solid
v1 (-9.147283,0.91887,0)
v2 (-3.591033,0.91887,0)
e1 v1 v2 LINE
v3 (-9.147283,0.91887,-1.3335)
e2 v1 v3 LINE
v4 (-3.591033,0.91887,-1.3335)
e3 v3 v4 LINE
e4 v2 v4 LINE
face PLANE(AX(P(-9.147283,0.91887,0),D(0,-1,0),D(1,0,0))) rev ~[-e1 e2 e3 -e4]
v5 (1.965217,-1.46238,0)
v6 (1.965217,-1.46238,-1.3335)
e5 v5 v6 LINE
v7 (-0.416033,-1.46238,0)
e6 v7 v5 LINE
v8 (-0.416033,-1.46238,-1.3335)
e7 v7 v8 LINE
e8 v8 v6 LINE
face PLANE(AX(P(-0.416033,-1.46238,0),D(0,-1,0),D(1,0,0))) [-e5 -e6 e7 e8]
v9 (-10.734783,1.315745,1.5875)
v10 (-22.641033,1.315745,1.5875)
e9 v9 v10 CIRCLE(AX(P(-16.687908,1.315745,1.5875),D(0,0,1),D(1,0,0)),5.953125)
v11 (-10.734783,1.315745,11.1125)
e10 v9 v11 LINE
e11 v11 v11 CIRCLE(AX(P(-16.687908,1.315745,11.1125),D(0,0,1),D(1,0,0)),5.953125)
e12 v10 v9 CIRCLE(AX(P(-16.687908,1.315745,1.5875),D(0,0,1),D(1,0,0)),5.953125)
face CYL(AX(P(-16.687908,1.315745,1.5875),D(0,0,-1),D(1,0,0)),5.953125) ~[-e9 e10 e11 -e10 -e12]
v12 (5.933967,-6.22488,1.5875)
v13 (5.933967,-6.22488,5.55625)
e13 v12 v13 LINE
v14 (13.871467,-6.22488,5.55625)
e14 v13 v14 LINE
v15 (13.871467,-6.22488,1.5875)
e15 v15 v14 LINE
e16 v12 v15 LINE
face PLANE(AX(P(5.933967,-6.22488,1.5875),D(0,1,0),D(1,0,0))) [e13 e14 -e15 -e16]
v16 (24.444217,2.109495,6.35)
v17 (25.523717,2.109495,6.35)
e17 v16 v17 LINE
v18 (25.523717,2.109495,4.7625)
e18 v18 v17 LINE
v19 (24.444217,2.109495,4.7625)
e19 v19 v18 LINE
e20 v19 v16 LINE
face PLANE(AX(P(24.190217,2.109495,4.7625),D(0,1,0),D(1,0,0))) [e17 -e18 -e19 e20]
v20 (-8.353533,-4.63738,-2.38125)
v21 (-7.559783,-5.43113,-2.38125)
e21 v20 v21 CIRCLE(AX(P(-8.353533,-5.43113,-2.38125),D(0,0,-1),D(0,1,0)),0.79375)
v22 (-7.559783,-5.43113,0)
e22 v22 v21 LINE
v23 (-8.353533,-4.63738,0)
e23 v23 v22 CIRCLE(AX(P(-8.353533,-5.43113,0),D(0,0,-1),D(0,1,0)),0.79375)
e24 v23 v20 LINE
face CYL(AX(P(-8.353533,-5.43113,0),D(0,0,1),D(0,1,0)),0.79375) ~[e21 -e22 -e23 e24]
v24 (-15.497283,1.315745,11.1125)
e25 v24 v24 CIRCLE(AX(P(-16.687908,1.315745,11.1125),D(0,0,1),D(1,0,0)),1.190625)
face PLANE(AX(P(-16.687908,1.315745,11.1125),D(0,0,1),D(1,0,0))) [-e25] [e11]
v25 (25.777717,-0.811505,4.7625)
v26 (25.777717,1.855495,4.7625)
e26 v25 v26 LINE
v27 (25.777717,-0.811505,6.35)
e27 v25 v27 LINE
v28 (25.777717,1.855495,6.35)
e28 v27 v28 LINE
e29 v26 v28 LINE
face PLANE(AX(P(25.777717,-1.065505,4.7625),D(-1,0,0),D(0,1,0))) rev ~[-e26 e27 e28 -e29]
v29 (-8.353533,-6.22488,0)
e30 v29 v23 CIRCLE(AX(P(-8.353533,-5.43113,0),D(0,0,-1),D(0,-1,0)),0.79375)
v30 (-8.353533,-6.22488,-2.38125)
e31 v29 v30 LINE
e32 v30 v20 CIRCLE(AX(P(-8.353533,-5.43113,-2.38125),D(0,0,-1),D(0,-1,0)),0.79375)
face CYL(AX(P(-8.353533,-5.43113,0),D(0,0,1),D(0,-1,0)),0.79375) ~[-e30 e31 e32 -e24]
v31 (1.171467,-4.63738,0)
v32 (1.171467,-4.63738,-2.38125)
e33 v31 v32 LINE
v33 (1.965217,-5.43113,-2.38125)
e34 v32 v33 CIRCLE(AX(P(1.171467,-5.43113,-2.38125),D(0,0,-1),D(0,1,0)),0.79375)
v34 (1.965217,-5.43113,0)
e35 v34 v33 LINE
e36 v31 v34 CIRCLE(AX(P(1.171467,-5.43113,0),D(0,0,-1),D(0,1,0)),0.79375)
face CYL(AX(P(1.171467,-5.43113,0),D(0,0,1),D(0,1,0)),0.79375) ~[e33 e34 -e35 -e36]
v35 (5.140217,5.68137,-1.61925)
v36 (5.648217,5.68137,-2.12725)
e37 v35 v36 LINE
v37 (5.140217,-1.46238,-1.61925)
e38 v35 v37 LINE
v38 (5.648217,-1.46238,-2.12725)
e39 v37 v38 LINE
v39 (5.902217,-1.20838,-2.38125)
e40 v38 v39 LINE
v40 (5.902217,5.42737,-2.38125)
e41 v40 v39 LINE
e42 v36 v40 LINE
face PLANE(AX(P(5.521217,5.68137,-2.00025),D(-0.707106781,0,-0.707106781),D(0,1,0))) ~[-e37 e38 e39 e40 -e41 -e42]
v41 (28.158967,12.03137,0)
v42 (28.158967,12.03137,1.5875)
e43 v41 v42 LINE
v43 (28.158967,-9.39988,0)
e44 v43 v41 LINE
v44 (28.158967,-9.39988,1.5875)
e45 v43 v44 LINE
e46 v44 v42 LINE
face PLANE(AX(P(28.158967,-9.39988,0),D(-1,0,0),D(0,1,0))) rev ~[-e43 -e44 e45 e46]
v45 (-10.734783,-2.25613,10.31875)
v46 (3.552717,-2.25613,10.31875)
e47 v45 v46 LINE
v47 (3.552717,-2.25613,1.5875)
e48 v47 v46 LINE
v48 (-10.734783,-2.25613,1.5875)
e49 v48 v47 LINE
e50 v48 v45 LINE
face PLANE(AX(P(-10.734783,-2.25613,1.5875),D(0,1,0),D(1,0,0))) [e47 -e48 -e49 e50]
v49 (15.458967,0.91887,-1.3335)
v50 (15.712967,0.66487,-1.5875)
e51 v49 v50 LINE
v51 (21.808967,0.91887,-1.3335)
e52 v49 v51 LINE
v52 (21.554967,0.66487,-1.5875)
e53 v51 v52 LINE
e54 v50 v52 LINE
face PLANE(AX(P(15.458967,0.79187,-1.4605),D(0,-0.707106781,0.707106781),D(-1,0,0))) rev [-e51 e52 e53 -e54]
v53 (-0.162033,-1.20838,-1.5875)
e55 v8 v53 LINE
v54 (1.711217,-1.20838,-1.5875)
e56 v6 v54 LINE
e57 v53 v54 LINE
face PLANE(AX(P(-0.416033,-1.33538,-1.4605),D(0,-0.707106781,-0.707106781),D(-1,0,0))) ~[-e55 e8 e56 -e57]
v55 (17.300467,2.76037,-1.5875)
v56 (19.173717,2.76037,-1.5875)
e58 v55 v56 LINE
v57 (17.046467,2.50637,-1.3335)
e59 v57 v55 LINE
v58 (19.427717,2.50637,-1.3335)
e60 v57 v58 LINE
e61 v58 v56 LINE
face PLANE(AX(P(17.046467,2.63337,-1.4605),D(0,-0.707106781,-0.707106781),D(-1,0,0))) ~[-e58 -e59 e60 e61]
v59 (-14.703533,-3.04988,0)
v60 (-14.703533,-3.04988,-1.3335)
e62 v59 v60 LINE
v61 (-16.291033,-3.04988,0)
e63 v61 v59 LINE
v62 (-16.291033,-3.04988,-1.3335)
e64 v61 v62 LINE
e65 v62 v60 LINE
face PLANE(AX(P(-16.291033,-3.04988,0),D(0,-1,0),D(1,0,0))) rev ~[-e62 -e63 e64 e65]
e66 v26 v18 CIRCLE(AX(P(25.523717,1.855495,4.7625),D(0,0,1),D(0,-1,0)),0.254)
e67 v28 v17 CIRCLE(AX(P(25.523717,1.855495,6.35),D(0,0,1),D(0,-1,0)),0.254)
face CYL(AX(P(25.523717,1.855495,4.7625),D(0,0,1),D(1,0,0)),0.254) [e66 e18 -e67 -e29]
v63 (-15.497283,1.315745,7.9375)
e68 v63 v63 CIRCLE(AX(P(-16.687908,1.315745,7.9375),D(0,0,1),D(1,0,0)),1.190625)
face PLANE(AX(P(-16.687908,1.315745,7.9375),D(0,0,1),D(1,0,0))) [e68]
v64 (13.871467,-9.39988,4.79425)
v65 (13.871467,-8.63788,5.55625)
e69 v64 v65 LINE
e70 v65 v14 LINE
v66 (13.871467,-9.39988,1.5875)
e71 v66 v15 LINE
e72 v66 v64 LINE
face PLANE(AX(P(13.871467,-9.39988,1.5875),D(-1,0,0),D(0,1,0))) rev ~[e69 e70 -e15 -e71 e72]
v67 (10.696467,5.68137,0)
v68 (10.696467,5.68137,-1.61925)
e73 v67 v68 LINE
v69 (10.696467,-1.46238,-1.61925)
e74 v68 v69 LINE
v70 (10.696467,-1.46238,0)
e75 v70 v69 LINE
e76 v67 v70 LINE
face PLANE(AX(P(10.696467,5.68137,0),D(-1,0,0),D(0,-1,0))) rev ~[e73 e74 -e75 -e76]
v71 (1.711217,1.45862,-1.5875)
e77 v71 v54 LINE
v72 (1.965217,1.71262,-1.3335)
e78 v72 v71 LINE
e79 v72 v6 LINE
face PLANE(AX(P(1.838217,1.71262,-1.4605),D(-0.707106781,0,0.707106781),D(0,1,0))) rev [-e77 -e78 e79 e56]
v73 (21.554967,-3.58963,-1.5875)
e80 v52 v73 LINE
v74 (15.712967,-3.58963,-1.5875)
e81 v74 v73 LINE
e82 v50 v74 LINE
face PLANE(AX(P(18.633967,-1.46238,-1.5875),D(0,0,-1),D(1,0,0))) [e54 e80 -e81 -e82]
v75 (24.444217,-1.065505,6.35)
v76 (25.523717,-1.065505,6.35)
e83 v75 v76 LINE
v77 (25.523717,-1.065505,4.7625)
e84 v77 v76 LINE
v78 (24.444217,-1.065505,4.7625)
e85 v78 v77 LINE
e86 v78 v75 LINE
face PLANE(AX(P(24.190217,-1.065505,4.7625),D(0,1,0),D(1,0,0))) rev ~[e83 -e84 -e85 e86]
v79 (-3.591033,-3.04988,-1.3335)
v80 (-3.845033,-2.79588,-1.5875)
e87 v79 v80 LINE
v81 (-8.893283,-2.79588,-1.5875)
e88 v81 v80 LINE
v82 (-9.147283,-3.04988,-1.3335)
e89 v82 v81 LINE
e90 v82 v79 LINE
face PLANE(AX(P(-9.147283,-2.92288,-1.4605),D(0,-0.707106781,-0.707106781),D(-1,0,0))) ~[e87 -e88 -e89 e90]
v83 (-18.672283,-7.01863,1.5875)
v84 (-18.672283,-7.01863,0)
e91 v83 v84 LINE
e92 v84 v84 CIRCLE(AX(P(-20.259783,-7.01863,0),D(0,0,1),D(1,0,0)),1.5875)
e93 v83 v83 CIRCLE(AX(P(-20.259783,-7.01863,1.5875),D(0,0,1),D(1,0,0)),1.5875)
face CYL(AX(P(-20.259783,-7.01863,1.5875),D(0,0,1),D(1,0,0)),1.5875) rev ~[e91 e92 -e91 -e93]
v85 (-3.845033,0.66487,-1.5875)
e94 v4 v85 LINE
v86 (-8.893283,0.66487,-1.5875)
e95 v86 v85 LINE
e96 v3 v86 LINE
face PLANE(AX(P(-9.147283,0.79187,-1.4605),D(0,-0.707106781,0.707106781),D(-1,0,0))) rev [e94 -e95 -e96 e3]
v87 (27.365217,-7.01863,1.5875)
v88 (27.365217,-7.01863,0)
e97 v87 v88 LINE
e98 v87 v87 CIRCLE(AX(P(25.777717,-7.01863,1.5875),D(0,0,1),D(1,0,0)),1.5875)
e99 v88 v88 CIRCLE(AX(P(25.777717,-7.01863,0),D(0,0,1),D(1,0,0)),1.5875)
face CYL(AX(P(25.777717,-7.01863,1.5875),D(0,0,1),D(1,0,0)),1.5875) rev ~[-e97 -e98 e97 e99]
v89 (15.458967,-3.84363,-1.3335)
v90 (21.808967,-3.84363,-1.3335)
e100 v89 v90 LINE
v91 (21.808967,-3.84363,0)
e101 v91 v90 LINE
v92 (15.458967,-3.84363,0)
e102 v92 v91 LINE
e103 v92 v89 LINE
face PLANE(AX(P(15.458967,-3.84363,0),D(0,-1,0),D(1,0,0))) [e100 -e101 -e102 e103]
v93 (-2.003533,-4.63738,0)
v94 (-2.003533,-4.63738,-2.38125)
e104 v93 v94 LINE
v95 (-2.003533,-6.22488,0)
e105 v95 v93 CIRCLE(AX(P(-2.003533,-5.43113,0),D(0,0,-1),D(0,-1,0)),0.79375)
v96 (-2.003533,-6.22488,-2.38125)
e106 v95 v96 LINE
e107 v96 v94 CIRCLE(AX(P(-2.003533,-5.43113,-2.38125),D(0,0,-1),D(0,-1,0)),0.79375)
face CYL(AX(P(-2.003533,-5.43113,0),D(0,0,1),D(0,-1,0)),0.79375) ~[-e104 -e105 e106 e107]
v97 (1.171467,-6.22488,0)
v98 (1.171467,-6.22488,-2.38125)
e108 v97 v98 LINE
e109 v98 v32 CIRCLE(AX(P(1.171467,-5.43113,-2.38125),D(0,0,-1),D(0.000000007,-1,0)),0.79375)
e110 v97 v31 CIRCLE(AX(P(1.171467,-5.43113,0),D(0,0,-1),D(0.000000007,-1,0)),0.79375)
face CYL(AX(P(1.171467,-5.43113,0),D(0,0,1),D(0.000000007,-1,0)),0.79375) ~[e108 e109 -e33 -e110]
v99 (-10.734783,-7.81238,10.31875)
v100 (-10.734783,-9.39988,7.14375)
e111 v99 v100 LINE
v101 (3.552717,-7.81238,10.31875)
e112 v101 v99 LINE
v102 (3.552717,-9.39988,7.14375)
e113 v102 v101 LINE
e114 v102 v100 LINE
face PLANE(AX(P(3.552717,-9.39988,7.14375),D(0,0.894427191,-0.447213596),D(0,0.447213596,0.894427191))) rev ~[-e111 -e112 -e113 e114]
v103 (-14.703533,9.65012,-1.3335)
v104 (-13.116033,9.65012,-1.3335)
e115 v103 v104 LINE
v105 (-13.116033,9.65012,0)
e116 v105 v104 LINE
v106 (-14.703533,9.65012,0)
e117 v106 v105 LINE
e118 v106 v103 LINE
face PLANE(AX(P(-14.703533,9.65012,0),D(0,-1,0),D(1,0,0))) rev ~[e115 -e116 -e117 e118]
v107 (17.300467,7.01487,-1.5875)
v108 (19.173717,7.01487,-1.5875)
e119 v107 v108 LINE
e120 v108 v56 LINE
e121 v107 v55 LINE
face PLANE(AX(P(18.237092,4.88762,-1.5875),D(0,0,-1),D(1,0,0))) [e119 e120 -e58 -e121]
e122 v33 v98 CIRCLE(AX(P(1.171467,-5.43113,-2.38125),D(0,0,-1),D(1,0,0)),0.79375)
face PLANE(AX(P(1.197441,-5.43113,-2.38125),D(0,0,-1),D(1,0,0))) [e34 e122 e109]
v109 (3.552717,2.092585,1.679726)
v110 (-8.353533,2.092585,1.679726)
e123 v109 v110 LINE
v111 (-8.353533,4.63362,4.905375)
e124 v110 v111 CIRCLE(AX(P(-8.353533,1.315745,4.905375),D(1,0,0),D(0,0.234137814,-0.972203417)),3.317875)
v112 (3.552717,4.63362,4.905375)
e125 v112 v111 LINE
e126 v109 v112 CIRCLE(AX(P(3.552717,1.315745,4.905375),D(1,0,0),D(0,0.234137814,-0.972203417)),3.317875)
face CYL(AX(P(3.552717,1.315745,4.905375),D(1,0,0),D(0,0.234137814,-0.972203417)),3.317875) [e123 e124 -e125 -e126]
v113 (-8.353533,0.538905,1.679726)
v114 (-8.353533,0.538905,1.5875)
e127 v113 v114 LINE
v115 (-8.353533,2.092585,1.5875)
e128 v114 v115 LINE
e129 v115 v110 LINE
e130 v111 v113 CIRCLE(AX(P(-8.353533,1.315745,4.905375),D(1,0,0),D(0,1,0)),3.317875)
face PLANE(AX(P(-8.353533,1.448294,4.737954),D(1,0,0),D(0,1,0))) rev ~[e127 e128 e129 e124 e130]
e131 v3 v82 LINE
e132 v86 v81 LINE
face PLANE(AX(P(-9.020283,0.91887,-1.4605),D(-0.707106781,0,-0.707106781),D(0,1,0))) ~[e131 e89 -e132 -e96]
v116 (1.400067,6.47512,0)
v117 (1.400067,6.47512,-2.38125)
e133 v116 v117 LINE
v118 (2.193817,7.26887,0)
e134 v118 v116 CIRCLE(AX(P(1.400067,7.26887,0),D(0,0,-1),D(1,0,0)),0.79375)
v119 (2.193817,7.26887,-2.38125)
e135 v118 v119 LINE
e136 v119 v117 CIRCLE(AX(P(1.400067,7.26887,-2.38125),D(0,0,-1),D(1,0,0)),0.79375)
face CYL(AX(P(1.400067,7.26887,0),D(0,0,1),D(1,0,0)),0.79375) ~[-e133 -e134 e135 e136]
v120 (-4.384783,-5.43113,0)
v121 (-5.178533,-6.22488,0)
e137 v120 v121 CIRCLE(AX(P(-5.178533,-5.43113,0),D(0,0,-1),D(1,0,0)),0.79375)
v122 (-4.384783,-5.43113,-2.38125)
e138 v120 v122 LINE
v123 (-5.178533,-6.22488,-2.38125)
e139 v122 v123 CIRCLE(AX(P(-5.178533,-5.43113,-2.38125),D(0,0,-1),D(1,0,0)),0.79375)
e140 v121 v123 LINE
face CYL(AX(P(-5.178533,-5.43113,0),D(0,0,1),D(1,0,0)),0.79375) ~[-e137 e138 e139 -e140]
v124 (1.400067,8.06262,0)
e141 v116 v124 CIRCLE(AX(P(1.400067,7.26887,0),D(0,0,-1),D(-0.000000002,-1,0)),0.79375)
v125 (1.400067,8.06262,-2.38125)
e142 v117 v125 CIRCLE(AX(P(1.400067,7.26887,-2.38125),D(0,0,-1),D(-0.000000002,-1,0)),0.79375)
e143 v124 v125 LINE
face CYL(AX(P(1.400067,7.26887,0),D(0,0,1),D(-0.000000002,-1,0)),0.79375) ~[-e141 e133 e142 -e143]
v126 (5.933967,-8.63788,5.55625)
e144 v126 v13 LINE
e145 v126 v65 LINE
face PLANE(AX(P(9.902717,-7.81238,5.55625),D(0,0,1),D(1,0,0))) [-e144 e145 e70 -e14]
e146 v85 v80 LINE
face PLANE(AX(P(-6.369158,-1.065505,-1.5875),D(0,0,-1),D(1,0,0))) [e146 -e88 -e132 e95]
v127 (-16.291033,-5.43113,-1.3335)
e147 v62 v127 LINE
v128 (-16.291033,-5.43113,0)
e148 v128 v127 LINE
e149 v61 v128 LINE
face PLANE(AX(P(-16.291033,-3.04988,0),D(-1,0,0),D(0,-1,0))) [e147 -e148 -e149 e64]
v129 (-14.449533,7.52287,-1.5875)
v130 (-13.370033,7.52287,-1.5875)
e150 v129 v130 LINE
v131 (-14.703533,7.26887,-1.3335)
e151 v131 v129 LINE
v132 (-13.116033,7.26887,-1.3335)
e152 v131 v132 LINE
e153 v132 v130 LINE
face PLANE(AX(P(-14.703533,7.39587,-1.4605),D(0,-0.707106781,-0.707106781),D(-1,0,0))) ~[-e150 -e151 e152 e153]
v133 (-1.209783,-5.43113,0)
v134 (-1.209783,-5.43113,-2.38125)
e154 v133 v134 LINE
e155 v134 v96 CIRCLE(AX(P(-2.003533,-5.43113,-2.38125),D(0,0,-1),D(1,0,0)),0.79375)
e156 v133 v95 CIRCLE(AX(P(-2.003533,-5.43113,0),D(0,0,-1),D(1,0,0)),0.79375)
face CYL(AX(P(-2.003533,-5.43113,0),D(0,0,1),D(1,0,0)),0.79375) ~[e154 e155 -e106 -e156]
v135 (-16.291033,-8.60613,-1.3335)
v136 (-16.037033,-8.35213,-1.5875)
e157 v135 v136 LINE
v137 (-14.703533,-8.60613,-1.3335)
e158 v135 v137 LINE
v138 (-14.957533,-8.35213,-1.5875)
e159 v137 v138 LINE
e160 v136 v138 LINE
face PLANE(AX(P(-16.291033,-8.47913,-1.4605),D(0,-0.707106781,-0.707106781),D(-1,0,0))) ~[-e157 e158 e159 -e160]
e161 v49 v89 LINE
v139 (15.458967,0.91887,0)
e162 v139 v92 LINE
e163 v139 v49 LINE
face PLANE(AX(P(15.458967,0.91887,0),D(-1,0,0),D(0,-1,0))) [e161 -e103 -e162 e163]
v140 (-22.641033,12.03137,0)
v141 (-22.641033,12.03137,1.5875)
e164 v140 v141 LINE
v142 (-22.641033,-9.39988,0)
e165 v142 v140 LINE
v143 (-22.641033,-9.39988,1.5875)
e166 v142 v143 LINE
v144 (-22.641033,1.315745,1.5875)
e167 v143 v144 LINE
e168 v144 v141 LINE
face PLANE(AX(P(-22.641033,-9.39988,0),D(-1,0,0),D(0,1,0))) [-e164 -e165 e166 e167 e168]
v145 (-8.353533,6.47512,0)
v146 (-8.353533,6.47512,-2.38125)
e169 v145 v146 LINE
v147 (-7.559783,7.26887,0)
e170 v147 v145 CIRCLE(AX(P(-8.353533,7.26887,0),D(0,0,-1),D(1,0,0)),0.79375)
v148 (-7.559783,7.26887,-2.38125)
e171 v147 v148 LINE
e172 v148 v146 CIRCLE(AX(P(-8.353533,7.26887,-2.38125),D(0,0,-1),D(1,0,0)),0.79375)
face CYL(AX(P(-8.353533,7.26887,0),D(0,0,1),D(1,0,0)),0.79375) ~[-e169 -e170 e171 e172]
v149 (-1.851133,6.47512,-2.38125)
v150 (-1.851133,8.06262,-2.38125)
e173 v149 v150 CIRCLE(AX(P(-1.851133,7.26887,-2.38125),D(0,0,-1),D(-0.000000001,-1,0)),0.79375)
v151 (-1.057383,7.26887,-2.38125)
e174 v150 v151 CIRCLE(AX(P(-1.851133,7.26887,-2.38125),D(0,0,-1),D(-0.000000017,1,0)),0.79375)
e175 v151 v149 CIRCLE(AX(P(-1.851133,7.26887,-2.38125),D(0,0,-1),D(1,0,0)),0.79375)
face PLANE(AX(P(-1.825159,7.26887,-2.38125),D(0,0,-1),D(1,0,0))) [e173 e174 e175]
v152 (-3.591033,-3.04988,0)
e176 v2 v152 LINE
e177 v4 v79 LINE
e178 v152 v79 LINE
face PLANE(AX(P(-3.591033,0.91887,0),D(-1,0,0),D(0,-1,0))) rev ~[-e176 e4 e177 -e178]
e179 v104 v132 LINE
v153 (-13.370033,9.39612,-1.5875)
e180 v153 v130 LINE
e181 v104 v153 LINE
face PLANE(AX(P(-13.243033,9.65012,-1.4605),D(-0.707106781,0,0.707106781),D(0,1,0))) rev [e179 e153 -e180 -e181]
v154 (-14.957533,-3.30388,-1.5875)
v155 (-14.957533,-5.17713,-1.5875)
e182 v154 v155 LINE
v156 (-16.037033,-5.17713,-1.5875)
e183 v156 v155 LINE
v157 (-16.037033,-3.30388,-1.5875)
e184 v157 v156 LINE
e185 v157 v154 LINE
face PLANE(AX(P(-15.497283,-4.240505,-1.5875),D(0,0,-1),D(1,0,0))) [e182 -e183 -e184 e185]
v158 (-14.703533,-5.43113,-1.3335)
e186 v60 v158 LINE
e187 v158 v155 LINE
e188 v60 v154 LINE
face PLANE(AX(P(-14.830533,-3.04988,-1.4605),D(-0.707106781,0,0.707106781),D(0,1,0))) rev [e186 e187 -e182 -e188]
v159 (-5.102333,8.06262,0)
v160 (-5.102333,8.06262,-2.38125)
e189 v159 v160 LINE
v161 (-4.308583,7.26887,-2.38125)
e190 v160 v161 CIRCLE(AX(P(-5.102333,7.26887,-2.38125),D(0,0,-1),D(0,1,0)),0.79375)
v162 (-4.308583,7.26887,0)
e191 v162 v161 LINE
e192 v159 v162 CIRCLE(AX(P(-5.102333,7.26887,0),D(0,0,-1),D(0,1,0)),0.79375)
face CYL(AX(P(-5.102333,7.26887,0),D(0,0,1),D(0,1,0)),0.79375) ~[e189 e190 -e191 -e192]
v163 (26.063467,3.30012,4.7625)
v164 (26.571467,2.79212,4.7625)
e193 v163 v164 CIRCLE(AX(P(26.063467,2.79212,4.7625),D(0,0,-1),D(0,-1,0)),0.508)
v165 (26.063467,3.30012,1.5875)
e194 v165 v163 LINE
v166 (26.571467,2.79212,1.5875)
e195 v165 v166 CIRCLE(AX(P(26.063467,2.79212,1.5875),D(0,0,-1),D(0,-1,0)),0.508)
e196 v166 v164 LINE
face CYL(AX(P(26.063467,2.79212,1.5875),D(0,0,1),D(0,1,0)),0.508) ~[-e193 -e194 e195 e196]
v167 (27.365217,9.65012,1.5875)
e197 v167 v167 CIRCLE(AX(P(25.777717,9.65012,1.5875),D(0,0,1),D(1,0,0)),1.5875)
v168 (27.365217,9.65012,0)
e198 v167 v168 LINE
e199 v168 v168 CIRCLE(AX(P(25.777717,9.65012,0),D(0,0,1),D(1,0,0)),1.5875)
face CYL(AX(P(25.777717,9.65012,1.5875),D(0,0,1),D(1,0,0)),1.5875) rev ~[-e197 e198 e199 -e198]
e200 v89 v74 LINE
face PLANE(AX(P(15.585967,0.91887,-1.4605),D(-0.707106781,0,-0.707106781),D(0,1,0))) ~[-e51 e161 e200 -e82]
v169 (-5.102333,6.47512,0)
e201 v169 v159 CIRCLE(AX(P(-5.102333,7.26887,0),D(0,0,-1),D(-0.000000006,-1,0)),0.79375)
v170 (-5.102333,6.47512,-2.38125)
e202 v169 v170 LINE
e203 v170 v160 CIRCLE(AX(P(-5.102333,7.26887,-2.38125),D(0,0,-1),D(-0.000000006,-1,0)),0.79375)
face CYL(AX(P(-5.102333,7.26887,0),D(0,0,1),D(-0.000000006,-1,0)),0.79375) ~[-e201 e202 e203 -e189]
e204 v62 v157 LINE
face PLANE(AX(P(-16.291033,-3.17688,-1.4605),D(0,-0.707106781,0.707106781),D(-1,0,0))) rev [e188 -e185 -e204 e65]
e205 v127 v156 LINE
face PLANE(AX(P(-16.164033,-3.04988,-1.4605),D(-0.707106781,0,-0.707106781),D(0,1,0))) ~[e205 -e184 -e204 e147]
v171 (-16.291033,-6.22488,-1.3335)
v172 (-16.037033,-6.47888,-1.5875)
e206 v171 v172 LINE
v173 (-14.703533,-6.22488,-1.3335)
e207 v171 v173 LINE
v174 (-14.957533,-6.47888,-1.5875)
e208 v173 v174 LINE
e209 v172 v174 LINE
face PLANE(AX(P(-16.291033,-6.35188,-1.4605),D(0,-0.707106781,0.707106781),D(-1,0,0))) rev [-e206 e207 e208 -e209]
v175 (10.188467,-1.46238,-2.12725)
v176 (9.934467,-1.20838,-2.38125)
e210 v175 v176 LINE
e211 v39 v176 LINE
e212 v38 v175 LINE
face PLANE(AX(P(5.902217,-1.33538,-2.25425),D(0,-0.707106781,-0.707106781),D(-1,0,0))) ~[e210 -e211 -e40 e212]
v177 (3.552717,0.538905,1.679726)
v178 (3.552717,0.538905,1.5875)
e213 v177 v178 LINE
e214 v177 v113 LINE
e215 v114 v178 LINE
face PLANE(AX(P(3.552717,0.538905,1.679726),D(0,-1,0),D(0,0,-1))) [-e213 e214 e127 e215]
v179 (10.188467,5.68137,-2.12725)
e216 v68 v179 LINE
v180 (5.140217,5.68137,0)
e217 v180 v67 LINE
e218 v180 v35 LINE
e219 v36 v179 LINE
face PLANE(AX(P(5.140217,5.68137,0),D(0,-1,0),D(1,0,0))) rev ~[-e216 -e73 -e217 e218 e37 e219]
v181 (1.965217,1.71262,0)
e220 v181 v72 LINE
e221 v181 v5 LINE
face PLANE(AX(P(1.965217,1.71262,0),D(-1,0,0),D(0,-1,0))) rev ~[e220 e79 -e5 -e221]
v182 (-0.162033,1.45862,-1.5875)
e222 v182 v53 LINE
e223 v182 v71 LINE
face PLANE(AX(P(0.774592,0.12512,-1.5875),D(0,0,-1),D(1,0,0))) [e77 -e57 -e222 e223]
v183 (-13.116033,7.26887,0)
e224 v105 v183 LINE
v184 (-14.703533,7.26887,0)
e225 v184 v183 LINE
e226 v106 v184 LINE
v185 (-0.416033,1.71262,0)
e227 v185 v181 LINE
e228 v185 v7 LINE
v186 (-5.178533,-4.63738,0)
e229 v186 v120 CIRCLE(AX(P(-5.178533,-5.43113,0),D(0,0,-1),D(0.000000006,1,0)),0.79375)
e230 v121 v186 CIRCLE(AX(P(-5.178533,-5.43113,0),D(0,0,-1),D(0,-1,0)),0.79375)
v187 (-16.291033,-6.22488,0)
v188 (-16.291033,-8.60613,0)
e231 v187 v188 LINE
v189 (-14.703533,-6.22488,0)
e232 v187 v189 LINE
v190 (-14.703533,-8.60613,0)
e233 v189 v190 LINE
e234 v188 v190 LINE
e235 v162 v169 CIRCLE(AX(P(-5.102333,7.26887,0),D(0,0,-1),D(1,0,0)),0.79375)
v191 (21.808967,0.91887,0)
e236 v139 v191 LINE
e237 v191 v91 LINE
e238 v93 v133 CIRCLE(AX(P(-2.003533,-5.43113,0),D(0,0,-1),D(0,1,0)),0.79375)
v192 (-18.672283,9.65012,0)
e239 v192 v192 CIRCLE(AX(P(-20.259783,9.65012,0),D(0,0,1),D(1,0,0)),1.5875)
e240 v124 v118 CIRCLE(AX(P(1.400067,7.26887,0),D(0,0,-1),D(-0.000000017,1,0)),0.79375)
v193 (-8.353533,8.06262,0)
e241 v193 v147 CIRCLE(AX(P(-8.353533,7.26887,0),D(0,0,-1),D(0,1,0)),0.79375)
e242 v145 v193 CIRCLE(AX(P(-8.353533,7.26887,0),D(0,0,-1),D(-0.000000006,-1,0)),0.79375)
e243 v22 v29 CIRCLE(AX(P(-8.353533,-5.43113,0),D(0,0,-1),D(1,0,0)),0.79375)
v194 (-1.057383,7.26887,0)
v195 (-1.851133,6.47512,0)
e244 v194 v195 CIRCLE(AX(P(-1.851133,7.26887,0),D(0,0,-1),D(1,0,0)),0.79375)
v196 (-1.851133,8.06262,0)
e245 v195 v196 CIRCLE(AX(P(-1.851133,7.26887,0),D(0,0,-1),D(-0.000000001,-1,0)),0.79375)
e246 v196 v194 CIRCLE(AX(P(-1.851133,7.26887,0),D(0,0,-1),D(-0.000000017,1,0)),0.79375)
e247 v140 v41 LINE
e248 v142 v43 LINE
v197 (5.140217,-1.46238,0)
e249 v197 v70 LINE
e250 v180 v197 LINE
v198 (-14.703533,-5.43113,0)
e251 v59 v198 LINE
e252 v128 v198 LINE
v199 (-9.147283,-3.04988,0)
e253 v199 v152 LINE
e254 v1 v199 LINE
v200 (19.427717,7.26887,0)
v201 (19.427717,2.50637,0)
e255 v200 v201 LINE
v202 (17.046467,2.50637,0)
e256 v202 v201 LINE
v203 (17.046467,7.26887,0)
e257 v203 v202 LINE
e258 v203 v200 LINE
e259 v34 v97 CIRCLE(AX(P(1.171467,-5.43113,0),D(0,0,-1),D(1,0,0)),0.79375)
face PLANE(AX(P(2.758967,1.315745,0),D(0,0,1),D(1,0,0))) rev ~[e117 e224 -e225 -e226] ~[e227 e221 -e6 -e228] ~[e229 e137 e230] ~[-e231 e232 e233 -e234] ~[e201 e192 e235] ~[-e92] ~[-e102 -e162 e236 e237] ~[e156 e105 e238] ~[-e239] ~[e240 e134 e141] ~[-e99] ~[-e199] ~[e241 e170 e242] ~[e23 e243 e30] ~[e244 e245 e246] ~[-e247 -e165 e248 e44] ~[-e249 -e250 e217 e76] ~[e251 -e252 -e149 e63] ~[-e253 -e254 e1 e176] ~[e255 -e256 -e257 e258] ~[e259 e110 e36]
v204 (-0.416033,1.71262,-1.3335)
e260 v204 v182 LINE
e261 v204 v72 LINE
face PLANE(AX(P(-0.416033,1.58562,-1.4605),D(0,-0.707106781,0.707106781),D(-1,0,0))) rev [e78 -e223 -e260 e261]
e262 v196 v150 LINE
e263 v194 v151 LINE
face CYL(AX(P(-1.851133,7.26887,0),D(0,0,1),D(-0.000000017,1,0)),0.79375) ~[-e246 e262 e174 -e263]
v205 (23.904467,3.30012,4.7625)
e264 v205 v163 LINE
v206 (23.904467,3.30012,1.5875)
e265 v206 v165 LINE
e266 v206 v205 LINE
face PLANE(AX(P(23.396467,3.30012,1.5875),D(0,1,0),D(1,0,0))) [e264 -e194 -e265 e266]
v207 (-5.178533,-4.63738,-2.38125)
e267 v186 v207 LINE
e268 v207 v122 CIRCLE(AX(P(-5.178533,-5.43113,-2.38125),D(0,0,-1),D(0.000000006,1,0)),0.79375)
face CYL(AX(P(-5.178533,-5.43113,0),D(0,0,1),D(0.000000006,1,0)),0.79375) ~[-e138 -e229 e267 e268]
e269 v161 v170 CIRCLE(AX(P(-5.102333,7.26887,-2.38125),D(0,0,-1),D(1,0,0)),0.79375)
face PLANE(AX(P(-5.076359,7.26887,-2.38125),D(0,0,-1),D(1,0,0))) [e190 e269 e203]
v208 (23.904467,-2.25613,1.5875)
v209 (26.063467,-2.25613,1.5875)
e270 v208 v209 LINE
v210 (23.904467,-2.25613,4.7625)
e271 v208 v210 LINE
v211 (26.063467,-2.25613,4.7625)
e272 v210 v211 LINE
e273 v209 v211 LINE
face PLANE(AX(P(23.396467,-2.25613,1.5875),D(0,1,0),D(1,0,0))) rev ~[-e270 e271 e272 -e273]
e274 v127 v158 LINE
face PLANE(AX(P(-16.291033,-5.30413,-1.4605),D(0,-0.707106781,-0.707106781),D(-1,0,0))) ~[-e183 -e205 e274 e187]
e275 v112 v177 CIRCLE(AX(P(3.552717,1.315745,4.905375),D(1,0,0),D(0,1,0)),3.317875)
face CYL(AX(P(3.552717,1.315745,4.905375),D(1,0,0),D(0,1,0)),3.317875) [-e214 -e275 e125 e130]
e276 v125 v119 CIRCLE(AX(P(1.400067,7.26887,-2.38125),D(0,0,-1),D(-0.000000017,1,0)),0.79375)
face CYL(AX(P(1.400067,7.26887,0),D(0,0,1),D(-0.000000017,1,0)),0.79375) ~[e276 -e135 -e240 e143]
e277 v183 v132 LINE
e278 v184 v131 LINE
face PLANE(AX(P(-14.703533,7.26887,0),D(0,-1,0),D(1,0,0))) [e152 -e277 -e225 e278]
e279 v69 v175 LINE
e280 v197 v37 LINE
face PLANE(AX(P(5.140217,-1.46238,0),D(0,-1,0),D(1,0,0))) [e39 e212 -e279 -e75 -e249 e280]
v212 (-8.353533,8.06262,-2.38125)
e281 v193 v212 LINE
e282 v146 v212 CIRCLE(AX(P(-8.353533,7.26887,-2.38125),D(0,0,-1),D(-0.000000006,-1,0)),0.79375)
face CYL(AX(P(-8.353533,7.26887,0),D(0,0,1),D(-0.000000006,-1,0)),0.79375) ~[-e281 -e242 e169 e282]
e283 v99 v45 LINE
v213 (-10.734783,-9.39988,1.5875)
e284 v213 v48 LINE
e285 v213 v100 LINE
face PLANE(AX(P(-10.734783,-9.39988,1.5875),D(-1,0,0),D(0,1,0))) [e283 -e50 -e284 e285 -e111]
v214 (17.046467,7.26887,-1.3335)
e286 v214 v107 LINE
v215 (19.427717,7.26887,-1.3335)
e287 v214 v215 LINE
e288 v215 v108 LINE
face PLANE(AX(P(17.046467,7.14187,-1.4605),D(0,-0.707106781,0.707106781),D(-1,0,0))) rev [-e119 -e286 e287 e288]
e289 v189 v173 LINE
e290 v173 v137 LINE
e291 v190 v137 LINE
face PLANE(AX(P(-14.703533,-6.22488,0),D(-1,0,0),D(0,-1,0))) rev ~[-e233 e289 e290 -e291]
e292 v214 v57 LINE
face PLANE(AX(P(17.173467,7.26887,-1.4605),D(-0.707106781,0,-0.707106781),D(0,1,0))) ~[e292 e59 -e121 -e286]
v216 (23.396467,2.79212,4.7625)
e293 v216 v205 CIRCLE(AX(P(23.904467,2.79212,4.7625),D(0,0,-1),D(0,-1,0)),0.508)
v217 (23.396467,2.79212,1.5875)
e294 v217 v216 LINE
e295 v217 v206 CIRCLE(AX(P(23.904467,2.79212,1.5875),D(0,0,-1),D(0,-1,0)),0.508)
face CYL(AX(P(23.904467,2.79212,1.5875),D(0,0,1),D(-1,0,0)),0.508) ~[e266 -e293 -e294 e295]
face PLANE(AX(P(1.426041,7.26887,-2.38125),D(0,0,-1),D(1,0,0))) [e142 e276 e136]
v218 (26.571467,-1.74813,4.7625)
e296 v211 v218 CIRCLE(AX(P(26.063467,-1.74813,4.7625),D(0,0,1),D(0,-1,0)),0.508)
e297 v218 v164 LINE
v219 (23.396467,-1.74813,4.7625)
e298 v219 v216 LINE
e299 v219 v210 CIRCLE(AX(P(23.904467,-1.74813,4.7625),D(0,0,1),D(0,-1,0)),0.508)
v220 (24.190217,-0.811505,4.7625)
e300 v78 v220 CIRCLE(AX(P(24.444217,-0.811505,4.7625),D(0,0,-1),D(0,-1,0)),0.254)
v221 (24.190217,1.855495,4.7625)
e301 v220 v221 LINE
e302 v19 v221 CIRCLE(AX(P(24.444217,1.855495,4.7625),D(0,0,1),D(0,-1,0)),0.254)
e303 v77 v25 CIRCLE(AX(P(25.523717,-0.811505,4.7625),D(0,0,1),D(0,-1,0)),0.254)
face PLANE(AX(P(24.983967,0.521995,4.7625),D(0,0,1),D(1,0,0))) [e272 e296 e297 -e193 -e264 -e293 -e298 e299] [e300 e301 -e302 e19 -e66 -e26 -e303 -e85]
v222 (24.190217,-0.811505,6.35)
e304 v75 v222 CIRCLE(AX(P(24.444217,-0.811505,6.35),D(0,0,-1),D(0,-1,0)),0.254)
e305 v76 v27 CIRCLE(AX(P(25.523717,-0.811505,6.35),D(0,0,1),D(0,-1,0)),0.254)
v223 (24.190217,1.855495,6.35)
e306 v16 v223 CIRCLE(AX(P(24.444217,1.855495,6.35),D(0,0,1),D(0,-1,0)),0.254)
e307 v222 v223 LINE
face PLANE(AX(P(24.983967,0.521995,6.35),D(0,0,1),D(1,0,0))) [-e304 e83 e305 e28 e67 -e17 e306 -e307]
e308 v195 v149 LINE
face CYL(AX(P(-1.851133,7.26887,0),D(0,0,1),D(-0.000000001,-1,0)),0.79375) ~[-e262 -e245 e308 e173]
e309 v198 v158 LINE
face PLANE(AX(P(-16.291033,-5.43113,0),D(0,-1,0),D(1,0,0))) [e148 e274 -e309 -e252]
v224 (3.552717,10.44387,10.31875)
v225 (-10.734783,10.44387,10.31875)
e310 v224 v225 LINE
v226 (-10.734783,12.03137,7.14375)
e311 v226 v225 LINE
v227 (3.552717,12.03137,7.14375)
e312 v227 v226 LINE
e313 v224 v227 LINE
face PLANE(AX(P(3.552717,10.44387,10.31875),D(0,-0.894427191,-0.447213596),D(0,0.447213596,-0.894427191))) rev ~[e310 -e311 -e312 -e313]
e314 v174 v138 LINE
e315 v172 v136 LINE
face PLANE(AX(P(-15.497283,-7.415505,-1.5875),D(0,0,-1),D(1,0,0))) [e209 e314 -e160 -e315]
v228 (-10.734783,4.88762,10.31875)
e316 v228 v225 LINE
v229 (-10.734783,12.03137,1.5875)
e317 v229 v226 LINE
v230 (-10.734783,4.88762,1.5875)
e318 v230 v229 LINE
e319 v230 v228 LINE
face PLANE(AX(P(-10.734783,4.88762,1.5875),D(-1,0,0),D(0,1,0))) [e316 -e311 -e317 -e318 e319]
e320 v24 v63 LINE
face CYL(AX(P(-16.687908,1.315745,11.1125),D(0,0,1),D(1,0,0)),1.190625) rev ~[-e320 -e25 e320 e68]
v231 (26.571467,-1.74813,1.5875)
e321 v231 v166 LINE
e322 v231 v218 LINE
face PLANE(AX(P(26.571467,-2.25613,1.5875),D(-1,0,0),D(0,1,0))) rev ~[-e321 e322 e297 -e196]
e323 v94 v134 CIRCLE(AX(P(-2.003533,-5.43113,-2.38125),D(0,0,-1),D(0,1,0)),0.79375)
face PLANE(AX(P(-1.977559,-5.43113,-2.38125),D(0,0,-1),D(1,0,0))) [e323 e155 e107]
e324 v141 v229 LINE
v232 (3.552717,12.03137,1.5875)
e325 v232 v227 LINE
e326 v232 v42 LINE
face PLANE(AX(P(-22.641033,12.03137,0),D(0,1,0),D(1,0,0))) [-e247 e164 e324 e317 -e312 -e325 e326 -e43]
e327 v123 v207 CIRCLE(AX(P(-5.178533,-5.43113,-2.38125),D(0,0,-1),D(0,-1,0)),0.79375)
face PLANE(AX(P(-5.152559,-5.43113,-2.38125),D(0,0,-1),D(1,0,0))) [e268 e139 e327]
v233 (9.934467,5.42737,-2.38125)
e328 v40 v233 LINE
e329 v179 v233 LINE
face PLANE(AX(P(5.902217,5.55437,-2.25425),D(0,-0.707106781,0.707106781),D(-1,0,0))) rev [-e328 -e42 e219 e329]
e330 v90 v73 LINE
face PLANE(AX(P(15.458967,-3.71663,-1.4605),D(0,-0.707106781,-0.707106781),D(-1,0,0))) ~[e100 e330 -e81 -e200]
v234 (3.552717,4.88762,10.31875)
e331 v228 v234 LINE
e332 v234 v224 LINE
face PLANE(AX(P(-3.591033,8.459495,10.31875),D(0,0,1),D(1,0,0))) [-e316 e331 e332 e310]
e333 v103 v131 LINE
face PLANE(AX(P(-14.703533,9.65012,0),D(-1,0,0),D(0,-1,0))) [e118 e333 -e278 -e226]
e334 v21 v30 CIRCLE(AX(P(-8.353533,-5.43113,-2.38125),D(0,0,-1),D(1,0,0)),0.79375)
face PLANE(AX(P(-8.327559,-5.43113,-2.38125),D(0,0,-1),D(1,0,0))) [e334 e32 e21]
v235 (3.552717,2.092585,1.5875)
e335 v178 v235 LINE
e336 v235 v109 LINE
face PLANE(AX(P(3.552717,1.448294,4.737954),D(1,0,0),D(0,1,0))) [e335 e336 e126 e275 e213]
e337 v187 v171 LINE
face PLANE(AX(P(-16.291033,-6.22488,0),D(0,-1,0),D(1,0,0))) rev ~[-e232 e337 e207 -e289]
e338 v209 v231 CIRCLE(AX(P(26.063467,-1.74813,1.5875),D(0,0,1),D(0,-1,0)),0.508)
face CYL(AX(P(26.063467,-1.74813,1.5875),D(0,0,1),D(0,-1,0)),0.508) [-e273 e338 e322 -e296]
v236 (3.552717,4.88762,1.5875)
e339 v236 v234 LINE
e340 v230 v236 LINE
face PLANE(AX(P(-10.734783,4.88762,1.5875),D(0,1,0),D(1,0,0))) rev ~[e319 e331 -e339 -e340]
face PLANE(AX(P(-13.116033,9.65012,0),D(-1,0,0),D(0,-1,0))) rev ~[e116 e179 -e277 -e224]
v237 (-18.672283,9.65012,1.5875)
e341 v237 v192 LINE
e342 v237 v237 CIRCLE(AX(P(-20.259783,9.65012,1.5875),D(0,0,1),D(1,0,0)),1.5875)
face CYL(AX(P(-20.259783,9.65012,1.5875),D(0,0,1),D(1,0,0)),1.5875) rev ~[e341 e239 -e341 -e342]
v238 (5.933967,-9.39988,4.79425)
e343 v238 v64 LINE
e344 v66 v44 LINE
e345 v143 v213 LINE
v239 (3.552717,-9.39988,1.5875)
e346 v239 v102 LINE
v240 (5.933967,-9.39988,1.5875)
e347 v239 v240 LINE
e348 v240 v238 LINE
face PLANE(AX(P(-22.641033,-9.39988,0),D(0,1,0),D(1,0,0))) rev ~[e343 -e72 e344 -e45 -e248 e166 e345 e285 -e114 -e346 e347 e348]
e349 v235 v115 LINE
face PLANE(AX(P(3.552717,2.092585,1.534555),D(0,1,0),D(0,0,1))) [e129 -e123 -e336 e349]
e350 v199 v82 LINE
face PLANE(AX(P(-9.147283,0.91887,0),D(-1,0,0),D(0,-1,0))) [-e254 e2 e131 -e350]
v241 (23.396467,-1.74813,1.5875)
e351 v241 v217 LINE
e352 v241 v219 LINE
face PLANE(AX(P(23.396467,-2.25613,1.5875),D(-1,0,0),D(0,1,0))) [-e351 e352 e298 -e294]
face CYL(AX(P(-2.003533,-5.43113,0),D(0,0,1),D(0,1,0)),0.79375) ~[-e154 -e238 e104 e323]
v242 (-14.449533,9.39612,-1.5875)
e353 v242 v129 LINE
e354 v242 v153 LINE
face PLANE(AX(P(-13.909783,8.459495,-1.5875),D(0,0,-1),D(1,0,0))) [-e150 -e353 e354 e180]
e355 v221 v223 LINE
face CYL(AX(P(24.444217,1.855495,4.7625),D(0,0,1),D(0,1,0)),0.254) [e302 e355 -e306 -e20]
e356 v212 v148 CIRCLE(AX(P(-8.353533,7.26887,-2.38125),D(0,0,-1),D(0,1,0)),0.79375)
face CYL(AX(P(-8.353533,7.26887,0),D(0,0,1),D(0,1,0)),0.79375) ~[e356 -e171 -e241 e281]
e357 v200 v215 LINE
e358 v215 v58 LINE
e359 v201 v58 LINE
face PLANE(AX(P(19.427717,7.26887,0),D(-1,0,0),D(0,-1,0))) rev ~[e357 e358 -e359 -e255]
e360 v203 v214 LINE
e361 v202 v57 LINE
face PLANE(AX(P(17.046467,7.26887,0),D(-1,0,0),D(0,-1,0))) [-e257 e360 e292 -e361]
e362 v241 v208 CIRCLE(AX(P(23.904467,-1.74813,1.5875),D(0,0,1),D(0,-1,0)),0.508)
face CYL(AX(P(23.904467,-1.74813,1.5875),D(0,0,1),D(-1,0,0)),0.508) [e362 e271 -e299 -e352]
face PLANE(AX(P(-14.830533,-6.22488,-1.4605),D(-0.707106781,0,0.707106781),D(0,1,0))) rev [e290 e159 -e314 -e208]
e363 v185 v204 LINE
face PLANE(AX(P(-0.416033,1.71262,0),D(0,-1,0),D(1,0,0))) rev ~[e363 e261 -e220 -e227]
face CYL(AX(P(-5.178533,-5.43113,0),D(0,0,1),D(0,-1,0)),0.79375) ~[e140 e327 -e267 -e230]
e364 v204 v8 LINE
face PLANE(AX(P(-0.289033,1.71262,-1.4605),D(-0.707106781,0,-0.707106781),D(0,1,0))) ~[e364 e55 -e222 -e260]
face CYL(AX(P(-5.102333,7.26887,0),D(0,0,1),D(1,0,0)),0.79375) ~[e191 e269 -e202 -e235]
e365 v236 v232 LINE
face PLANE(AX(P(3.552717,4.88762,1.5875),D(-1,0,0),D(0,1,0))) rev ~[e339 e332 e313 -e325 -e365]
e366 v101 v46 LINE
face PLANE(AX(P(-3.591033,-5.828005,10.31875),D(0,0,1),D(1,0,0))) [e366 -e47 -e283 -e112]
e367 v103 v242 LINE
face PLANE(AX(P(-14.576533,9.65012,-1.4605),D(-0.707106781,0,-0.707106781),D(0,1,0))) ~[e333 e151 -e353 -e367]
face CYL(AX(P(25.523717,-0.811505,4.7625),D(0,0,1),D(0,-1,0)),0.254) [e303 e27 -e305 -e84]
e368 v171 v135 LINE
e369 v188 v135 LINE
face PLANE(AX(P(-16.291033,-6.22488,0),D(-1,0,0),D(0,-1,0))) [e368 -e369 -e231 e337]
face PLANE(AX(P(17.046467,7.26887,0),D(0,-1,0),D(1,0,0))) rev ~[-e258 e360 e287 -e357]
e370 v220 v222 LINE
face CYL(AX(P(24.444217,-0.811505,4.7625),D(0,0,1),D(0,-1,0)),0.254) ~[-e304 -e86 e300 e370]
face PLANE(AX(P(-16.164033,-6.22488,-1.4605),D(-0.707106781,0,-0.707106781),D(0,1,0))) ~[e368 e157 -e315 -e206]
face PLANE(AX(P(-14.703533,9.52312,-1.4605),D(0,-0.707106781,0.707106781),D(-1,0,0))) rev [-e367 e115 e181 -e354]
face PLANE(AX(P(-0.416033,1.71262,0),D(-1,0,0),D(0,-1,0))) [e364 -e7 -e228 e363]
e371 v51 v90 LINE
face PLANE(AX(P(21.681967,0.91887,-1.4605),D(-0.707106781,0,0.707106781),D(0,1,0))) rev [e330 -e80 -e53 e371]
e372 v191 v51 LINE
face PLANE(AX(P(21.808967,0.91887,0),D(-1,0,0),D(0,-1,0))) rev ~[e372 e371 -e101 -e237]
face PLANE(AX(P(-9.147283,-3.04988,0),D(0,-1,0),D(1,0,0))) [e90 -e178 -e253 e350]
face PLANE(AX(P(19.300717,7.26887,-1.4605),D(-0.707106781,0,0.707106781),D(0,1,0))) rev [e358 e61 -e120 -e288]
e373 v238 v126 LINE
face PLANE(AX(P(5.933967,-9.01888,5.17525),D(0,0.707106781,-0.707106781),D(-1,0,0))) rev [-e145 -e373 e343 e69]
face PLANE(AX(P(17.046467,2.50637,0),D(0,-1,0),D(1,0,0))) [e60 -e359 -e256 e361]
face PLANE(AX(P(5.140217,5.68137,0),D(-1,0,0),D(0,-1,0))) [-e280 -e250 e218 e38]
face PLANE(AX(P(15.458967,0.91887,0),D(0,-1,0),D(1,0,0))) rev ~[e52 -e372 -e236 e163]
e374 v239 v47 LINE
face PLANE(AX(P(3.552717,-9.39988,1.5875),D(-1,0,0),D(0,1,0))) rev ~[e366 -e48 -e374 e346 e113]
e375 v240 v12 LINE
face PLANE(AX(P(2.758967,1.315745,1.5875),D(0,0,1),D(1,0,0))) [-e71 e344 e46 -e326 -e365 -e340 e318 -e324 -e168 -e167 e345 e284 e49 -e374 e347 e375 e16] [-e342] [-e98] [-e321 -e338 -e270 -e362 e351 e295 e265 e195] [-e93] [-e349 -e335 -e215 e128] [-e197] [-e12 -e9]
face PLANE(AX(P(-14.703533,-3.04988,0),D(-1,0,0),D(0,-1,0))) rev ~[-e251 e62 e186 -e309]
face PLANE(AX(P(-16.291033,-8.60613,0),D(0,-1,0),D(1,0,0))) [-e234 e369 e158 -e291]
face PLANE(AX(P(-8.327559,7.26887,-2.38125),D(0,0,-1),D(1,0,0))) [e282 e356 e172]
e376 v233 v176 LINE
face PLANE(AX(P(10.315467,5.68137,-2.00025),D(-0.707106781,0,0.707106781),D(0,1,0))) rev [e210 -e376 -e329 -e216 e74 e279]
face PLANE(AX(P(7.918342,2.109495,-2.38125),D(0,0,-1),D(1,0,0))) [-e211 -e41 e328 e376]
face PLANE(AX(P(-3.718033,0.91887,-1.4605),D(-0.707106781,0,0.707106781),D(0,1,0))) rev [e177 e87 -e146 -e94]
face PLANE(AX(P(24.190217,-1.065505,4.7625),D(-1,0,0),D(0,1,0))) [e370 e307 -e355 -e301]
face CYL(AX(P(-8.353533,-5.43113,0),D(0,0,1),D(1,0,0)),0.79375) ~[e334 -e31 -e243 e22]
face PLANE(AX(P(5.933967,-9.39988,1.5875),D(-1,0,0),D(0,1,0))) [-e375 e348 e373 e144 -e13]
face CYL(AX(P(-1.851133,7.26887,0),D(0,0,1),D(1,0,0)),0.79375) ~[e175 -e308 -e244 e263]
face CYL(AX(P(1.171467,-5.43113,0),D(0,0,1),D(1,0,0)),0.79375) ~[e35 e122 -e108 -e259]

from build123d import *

# Parameters (mm, degrees)
F0_W      = 50.8
F0_H      = 21.43125
F1_DEPTH  = 1.5875
F2_R      = 1.5875
F3_DEPTH  = 3.175
F5_DEPTH  = 2.38125
F6_W      = 1.5875
F6_H      = 2.38125
F6_W_2    = 5.55625
F6_H_2    = 3.96875
F6_W_3    = 2.38125
F6_H_3    = 3.175
F6_W_4    = 6.35
F6_H_4    = 4.7625
F7_DEPTH  = 1.5875
F8_SIZE   = 0.254
F9_W      = 5.55625
F9_H      = 7.14375
F10_DEPTH = 2.38125
F11_SIZE  = 0.762
F12_SIZE  = 0.254
F13_R     = 5.953125
F14_DEPTH = 9.525
F15_R     = 1.190625
F16_DEPTH = 3.175
F17_W     = 14.2875
F17_H     = 7.14375
F18_DEPTH = 8.73125
F20_DEPTH = 15.24
F22_DEPTH = 11.90625
F23_W     = 3.175
F23_H     = 5.55625
F24_DEPTH = 3.175
F25_W     = 1.5875
F25_H     = 3.175
F26_DEPTH = 1.5875
F27_R     = 0.254
F28_R     = 0.508
F29_W     = 7.9375
F29_H     = 3.175
F30_DEPTH = 3.96875
F31_SIZE  = 0.762


# Not quite as in the source:
# - a length typed as a fraction of an inch, garbled in the dataset ("3 / 203.2 mm" for 3/8 in), is restored


with BuildPart() as f1:
    # F0 (on Top) → F1 (new body)
    with BuildSketch(Plane.XY):
        with Locations((2.7589667588, 1.3157454271)):
            Rectangle(F0_W, F0_H)
    extrude(amount=F1_DEPTH)

    # F2 (on face) → F3 (cut)
    with BuildSketch(Plane.XY.offset(1.5875)):
        with Locations((25.7777167588, -7.0186295729)):
            Circle(F2_R)
        with Locations((25.7777167588, 9.6501204271)):
            Circle(F2_R)
        with Locations((-20.2597832412, 9.6501204271)):
            Circle(F2_R)
        with Locations((-20.2597832412, -7.0186295729)):
            Circle(F2_R)
    extrude(amount=-F3_DEPTH, mode=Mode.SUBTRACT)

    # F4 (on face) → F5 (join)
    with BuildSketch(Plane(origin=(0, 0, 0), x_dir=(1, 0, 0), z_dir=(0, 0, -1))):
        with BuildLine():
            ThreePointArc((-5.1785332412, 6.2248795729), (-5.9722832412, 5.4311295706), (-5.1785332365, 4.6373795729))
            ThreePointArc((-5.1785332365, 4.6373795729), (-4.6172672319, 4.869863567), (-4.3847832412, 5.4311295729))
            ThreePointArc((-4.3847832412, 5.4311295729), (-4.6172672336, 5.9923955805), (-5.1785332412, 6.2248795729))
        make_face()
        with BuildLine():
            ThreePointArc((-2.0035332412, 6.2248795729), (-2.7972832412, 5.4311295729), (-2.0035332412, 4.6373795729))
            ThreePointArc((-2.0035332412, 4.6373795729), (-1.4422672336, 4.8698635653), (-1.2097832412, 5.4311295729))
            ThreePointArc((-1.2097832412, 5.4311295729), (-1.4422672336, 5.9923955805), (-2.0035332412, 6.2248795729))
        make_face()
        with BuildLine():
            ThreePointArc((1.1714667642, 6.2248795729), (0.3777167588, 5.4311295756), (1.1714667588, 4.6373795729))
            ThreePointArc((1.1714667588, 4.6373795729), (1.7327327664, 4.8698635653), (1.9652167588, 5.4311295729))
            ThreePointArc((1.9652167588, 5.4311295729), (1.7327327683, 5.9923955786), (1.1714667642, 6.2248795729))
        make_face()
        with BuildLine():
            ThreePointArc((-7.5597832412, -7.2688704271), (-7.7922672352, -6.7076044179), (-8.3535332458, -6.4751204271))
            ThreePointArc((-8.3535332458, -6.4751204271), (-9.1472832412, -7.2688704294), (-8.3535332412, -8.0626204271))
            ThreePointArc((-8.3535332412, -8.0626204271), (-7.7922672336, -7.8301364347), (-7.5597832412, -7.2688704271))
        make_face()
        with BuildLine():
            ThreePointArc((-4.3085832412, -7.2688704271), (-4.5410672352, -6.7076044179), (-5.1023332458, -6.4751204271))
            ThreePointArc((-5.1023332458, -6.4751204271), (-5.8960832412, -7.2688704294), (-5.1023332412, -8.0626204271))
            ThreePointArc((-5.1023332412, -8.0626204271), (-4.5410672336, -7.8301364347), (-4.3085832412, -7.2688704271))
        make_face()
        with BuildLine():
            ThreePointArc((-1.0573832412, -7.2688704271), (-1.2898672338, -6.7076044193), (-1.8511332418, -6.4751204271))
            ThreePointArc((-1.8511332418, -6.4751204271), (-2.6448832412, -7.2688704205), (-1.8511332549, -8.0626204271))
            ThreePointArc((-1.8511332549, -8.0626204271), (-1.2898672385, -7.8301364395), (-1.0573832412, -7.2688704271))
        make_face()
        with BuildLine():
            ThreePointArc((2.1938167588, -7.2688704271), (1.9613327658, -6.7076044189), (1.4000667571, -6.4751204271))
            ThreePointArc((1.4000667571, -6.4751204271), (0.6063167588, -7.2688704213), (1.4000667456, -8.0626204271))
            ThreePointArc((1.4000667456, -8.0626204271), (1.9613327617, -7.8301364393), (2.1938167588, -7.2688704271))
        make_face()
        with BuildLine():
            ThreePointArc((-8.3535332412, 6.2248795729), (-9.1472832412, 5.4311295729), (-8.3535332412, 4.6373795729))
            ThreePointArc((-8.3535332412, 4.6373795729), (-7.7922672336, 4.8698635653), (-7.5597832412, 5.4311295729))
            ThreePointArc((-7.5597832412, 5.4311295729), (-7.7922672336, 5.9923955805), (-8.3535332412, 6.2248795729))
        make_face()
    extrude(amount=F5_DEPTH)

    # F6 (on face) → F7 (join)
    with BuildSketch(Plane(origin=(0, 0, 0), x_dir=(1, 0, 0), z_dir=(0, 0, -1))):
        with Locations((-15.4972832412, 7.4155045729)):
            Rectangle(F6_W, F6_H)
        with Locations((-15.4972832412, 4.2405045729)):
            Rectangle(F6_W, F6_H)
        with Locations((-13.9097832412, -8.4594954271)):
            Rectangle(F6_W, F6_H)
        with Locations((-6.3691582412, 1.0655045729)):
            Rectangle(F6_W_2, F6_H_2)
        with Locations((0.7745917588, -0.1251204271)):
            Rectangle(F6_W_3, F6_H_3)
        with Locations((18.6339667588, 1.4623795729)):
            Rectangle(F6_W_4, F6_H_4)
        with Locations((18.2370917588, -4.8876204271)):
            Rectangle(F6_W_3, F6_H_4)
    extrude(amount=F7_DEPTH)

    # F8
    f8_edges = [f1.edges().sort_by_distance(p)[0] for p in [
        (-13.909783, 7.26887, -1.5875),
        (-14.703533, 8.459495, -1.5875),
        (-13.909783, 9.65012, -1.5875),
        (-13.116033, 8.459495, -1.5875),
        (-15.497283, -5.43113, -1.5875),
        (-16.291033, -4.240505, -1.5875),
        (-15.497283, -3.04988, -1.5875),
        (-14.703533, -4.240505, -1.5875),
        (-15.497283, -8.60613, -1.5875),
        (-16.291033, -7.415505, -1.5875),
        (-15.497283, -6.22488, -1.5875),
        (-14.703533, -7.415505, -1.5875),
        (-3.591033, -1.065505, -1.5875),
        (-6.369158, -3.04988, -1.5875),
        (-9.147283, -1.065505, -1.5875),
        (-6.369158, 0.91887, -1.5875),
        (0.774592, 1.71262, -1.5875),
        (1.965217, 0.12512, -1.5875),
        (0.774592, -1.46238, -1.5875),
        (-0.416033, 0.12512, -1.5875),
        (18.633967, 0.91887, -1.5875),
        (21.808967, -1.46238, -1.5875),
        (18.633967, -3.84363, -1.5875),
        (15.458967, -1.46238, -1.5875),
        (18.237092, 2.50637, -1.5875),
        (17.046467, 4.88762, -1.5875),
        (18.237092, 7.26887, -1.5875),
        (19.427717, 4.88762, -1.5875),
    ]]
    chamfer(f8_edges, length=F8_SIZE)

    # F9 (on face) → F10 (join)
    with BuildSketch(Plane(origin=(0, 0, 0), x_dir=(1, 0, 0), z_dir=(0, 0, -1))):
        with Locations((7.9183417588, -2.1094954271)):
            Rectangle(F9_W, F9_H)
    extrude(amount=F10_DEPTH)

    # F11
    f11_edges = [f1.edges().sort_by_distance(p)[0] for p in [
        (10.696467, 2.109495, -2.38125),
        (5.140217, 2.109495, -2.38125),
    ]]
    chamfer(f11_edges, length=F11_SIZE)

    # F12
    f12_edges = [f1.edges().sort_by_distance(p)[0] for p in [
        (7.918342, -1.46238, -2.38125),
        (7.918342, 5.68137, -2.38125),
    ]]
    chamfer(f12_edges, length=F12_SIZE)

    # F13 (on face) → F14 (join)
    with BuildSketch(Plane.XY.offset(1.5875)):
        with Locations((-16.6879082412, 1.3157454271)):
            Circle(F13_R)
    extrude(amount=F14_DEPTH)

    # F15 (on face) → F16 (cut)
    with BuildSketch(Plane.XY.offset(11.1125)):
        with Locations((-16.6879082412, 1.3157454271)):
            Circle(F15_R)
    extrude(amount=-F16_DEPTH, mode=Mode.SUBTRACT)

    # F17 (on face) → F18 (join)
    with BuildSketch(Plane.XY.offset(1.5875)):
        with Locations((-3.5910332412, 8.4594954271)):
            Rectangle(F17_W, F17_H)
        with Locations((-3.5910332412, -5.8280045729)):
            Rectangle(F17_W, F17_H)
    extrude(amount=F18_DEPTH)

    # F19 (on face) → F20 (cut)
    with BuildSketch(Plane.YZ.offset(3.5527167588)):
        Polygon((-12.6245096326, 12.3970924459), (-9.3998795729, 7.14375), (-7.8123795729, 10.31875), (-6.8544447422, 13.4305364035), align=None)
        Polygon((11.735675374, 13.160722746), (10.4438704271, 10.31875), (12.0313704271, 7.14375), (15.6484242786, 9.6412404954), (16.4722963069, 13.6774447247), align=None)
    extrude(amount=-F20_DEPTH, mode=Mode.SUBTRACT)

    # F21 (on face) → F22 (join)
    with BuildSketch(Plane.YZ.offset(3.5527167588)):
        with BuildLine():
            ThreePointArc((2.0925854259, 1.6797255876), (3.9220601171, 2.8522266244), (4.6336204271, 4.905375))
            ThreePointArc((4.6336204271, 4.905375), (-0.7374029485, 7.51168969), (0.5389054283, 1.6797255876))
            Line((0.5389054283, 1.6797255876), (2.0925854259, 1.6797255876))
        make_face()
        with BuildLine():
            Line((2.0925854259, 1.6797255876), (0.5389054283, 1.6797255876))
            ThreePointArc((0.5389054283, 1.6797255876), (1.3157454271, 1.5875), (2.0925854259, 1.6797255876))
        make_face()
        with BuildLine():
            ThreePointArc((2.0925854259, 1.6797255876), (1.3157454271, 1.5875), (0.5389054283, 1.6797255876))
            Line((0.5389054283, 1.6797255876), (0.5389054283, 1.5345554566))
            Line((0.5389054283, 1.5345554566), (2.0925854259, 1.5345554566))
            Line((2.0925854259, 1.5345554566), (2.0925854259, 1.6797255876))
        make_face()
    extrude(amount=-F22_DEPTH)

    # F23 (on face) → F24 (join)
    with BuildSketch(Plane.XY.offset(1.5875)):
        with Locations((24.9839667588, 0.5219954271)):
            Rectangle(F23_W, F23_H)
    extrude(amount=F24_DEPTH)

    # F25 (on face) → F26 (join)
    with BuildSketch(Plane.XY.offset(4.7625)):
        with Locations((24.9839667588, 0.5219954271)):
            Rectangle(F25_W, F25_H)
    extrude(amount=F26_DEPTH)

    # F27
    f27_edges = [f1.edges().sort_by_distance(p)[0] for p in [
        (25.777717, -1.065505, 5.55625),
        (24.190217, -1.065505, 5.55625),
        (24.190217, 2.109495, 5.55625),
        (25.777717, 2.109495, 5.55625),
    ]]
    fillet(f27_edges, radius=F27_R)

    # F28
    f28_edges = [f1.edges().sort_by_distance(p)[0] for p in [
        (26.571467, 3.30012, 3.175),
        (23.396467, 3.30012, 3.175),
        (26.571467, -2.25613, 3.175),
        (23.396467, -2.25613, 3.175),
    ]]
    fillet(f28_edges, radius=F28_R)

    # F29 (on face) → F30 (join)
    with BuildSketch(Plane.XY.offset(1.5875)):
        with Locations((9.9027167588, -7.8123795729)):
            Rectangle(F29_W, F29_H)
    extrude(amount=F30_DEPTH)

    # F31
    f31_edges = [f1.edges().sort_by_distance(p)[0] for p in [
        (9.902717, -9.39988, 5.55625),
    ]]
    chamfer(f31_edges, length=F31_SIZE)


solid = f1.part
